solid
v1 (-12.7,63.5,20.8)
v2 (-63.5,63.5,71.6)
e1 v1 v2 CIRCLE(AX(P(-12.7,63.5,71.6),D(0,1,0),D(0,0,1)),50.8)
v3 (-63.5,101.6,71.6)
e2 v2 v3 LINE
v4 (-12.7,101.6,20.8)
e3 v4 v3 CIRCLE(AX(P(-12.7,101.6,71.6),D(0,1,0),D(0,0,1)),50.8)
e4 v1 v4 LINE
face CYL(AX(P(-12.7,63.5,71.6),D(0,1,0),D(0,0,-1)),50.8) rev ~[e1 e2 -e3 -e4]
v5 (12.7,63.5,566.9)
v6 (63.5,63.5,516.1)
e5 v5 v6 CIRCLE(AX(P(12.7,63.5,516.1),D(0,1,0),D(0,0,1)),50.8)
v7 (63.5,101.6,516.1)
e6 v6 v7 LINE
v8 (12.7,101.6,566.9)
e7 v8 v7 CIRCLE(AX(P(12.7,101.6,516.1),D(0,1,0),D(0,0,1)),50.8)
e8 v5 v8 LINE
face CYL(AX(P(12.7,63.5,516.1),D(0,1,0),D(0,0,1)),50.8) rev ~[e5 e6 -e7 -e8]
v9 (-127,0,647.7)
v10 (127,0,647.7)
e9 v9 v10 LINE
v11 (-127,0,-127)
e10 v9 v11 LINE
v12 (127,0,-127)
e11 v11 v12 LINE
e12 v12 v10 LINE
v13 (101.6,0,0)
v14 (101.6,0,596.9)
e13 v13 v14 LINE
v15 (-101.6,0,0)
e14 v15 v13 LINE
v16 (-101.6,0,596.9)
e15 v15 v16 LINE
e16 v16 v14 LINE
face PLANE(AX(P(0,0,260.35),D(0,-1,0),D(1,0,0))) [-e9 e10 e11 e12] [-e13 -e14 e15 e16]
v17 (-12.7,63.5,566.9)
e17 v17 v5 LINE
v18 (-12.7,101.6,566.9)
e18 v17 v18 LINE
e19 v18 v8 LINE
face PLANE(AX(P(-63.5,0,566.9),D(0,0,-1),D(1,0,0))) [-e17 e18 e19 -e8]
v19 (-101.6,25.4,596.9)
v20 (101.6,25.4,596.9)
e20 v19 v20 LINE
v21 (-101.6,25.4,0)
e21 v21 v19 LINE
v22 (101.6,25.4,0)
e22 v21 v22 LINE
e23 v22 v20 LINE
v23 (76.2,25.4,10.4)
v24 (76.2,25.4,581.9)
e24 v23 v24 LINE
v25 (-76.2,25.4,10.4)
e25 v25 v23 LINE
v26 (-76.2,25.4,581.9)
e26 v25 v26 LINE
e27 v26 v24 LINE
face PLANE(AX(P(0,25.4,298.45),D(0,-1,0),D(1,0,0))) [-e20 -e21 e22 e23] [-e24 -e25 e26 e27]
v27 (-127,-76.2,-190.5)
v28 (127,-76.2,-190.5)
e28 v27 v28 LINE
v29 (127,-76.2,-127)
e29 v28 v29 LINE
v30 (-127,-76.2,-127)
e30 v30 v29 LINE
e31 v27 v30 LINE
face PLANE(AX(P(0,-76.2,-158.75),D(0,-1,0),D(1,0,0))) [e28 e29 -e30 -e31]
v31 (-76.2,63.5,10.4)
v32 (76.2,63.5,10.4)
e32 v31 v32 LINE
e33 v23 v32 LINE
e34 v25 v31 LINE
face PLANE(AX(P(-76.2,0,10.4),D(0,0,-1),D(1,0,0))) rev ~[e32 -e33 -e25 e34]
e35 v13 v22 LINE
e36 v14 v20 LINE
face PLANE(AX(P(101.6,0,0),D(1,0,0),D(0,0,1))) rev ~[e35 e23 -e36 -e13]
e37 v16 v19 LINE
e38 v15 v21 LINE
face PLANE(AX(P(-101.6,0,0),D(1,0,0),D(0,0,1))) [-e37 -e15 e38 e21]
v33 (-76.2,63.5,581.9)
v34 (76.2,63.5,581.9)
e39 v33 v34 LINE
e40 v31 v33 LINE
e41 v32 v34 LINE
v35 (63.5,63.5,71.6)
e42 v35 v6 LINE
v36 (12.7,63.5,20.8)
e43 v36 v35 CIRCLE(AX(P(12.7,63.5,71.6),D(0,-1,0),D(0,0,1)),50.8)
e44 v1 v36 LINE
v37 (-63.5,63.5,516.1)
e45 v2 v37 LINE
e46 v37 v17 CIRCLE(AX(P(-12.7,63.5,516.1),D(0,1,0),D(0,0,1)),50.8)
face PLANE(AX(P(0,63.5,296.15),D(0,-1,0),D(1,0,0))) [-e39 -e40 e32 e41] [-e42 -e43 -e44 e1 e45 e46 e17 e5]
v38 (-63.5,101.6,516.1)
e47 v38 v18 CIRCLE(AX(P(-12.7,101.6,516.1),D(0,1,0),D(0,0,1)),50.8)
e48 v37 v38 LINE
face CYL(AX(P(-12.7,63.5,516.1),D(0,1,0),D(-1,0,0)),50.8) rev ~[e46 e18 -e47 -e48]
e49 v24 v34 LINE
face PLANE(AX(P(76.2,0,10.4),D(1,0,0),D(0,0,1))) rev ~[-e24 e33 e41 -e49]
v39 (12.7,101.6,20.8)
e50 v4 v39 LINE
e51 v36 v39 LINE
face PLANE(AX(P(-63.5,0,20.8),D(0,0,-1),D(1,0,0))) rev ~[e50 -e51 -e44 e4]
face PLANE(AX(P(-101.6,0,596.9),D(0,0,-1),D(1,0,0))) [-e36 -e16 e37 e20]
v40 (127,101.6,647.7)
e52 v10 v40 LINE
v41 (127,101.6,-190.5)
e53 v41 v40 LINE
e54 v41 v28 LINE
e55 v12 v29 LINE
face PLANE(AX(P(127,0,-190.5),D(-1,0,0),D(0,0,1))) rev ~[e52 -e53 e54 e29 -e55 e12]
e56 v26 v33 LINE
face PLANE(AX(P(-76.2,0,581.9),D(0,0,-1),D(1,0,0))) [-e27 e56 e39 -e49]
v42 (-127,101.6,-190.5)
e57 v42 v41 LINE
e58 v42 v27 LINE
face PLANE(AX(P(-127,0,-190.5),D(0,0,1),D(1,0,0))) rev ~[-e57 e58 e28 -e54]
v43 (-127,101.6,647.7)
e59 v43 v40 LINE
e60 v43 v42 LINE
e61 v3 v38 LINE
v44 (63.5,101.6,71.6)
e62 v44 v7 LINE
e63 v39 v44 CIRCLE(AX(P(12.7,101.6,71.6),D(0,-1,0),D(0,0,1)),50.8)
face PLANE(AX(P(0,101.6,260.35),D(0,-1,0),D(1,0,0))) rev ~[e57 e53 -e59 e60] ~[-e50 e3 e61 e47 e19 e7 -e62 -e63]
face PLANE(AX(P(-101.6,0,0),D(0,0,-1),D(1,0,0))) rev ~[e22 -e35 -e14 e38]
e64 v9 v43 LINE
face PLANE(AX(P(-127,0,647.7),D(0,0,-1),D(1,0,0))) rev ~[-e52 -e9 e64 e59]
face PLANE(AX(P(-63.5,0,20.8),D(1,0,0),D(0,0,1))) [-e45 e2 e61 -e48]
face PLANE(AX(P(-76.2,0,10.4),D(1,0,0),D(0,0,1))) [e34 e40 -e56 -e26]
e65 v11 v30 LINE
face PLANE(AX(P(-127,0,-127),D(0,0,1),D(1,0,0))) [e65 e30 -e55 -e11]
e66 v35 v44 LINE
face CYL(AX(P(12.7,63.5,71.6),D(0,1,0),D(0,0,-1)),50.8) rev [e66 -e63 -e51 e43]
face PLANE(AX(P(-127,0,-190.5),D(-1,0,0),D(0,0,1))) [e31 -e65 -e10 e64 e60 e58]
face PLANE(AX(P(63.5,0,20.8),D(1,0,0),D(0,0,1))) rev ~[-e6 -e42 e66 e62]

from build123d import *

# Parameters (mm, degrees)
F0_W     = 254
F0_H     = 774.7
F0_W_2   = 203.2
F0_H_2   = 596.9
F0_W_3   = 152.4
F0_H_3   = 571.5
F0_W_4   = 127
F0_H_4   = 546.1
F0_H_5   = 63.5
F1_DEPTH = 101.6
F2_DEPTH = 25.4
F3_DEPTH = 63.5
F4_R     = 50.8
F5_DEPTH = 76.2


# Not quite as in the source:
# - a feature names something its author has since deleted; it is built from what else it names


with BuildPart() as f1:
    # F0 (on Front) → F1 (new body)
    with BuildSketch(Plane.XZ):
        with Locations((0, 260.35)):
            Rectangle(F0_W, F0_H)
        with Locations((0, 298.45)):
            Rectangle(F0_W_2, F0_H_2, mode=Mode.SUBTRACT)
        with Locations((0, 298.45)):
            Rectangle(F0_W_2, F0_H_2)
        with Locations((0, 296.15)):
            Rectangle(F0_W_3, F0_H_3, mode=Mode.SUBTRACT)
        with Locations((0, 296.15)):
            Rectangle(F0_W_3, F0_H_3)
        with Locations((0, 293.85)):
            Rectangle(F0_W_4, F0_H_4, mode=Mode.SUBTRACT)
        with Locations((0, -158.75)):
            Rectangle(F0_W, F0_H_5)
    extrude(amount=-F1_DEPTH)

    # F0 (on Front) → F2 (cut)
    with BuildSketch(Plane.XZ):
        with Locations((0, 298.45)):
            Rectangle(F0_W_2, F0_H_2)
        with Locations((0, 296.15)):
            Rectangle(F0_W_3, F0_H_3, mode=Mode.SUBTRACT)
    extrude(amount=-F2_DEPTH, mode=Mode.SUBTRACT)

    # F0 (on Front) → F3 (cut)
    with BuildSketch(Plane.XZ):
        with Locations((0, 296.15)):
            Rectangle(F0_W_3, F0_H_3)
        with Locations((0, 293.85)):
            Rectangle(F0_W_4, F0_H_4, mode=Mode.SUBTRACT)
    extrude(amount=-F3_DEPTH, mode=Mode.SUBTRACT)

    # F4
    f4_edges = [f1.edges().sort_by_distance(p)[0] for p in [
        (63.5, 82.55, 566.9),
        (-63.5, 82.55, 566.9),
        (-63.5, 82.55, 20.8),
        (63.5, 82.55, 20.8),
    ]]
    fillet(f4_edges, radius=F4_R)

    # F0 (on Front) → F5 (join)
    with BuildSketch(Plane.XZ):
        with Locations((0, -158.75)):
            Rectangle(F0_W, F0_H_5)
    extrude(amount=F5_DEPTH)


solid = f1.part
